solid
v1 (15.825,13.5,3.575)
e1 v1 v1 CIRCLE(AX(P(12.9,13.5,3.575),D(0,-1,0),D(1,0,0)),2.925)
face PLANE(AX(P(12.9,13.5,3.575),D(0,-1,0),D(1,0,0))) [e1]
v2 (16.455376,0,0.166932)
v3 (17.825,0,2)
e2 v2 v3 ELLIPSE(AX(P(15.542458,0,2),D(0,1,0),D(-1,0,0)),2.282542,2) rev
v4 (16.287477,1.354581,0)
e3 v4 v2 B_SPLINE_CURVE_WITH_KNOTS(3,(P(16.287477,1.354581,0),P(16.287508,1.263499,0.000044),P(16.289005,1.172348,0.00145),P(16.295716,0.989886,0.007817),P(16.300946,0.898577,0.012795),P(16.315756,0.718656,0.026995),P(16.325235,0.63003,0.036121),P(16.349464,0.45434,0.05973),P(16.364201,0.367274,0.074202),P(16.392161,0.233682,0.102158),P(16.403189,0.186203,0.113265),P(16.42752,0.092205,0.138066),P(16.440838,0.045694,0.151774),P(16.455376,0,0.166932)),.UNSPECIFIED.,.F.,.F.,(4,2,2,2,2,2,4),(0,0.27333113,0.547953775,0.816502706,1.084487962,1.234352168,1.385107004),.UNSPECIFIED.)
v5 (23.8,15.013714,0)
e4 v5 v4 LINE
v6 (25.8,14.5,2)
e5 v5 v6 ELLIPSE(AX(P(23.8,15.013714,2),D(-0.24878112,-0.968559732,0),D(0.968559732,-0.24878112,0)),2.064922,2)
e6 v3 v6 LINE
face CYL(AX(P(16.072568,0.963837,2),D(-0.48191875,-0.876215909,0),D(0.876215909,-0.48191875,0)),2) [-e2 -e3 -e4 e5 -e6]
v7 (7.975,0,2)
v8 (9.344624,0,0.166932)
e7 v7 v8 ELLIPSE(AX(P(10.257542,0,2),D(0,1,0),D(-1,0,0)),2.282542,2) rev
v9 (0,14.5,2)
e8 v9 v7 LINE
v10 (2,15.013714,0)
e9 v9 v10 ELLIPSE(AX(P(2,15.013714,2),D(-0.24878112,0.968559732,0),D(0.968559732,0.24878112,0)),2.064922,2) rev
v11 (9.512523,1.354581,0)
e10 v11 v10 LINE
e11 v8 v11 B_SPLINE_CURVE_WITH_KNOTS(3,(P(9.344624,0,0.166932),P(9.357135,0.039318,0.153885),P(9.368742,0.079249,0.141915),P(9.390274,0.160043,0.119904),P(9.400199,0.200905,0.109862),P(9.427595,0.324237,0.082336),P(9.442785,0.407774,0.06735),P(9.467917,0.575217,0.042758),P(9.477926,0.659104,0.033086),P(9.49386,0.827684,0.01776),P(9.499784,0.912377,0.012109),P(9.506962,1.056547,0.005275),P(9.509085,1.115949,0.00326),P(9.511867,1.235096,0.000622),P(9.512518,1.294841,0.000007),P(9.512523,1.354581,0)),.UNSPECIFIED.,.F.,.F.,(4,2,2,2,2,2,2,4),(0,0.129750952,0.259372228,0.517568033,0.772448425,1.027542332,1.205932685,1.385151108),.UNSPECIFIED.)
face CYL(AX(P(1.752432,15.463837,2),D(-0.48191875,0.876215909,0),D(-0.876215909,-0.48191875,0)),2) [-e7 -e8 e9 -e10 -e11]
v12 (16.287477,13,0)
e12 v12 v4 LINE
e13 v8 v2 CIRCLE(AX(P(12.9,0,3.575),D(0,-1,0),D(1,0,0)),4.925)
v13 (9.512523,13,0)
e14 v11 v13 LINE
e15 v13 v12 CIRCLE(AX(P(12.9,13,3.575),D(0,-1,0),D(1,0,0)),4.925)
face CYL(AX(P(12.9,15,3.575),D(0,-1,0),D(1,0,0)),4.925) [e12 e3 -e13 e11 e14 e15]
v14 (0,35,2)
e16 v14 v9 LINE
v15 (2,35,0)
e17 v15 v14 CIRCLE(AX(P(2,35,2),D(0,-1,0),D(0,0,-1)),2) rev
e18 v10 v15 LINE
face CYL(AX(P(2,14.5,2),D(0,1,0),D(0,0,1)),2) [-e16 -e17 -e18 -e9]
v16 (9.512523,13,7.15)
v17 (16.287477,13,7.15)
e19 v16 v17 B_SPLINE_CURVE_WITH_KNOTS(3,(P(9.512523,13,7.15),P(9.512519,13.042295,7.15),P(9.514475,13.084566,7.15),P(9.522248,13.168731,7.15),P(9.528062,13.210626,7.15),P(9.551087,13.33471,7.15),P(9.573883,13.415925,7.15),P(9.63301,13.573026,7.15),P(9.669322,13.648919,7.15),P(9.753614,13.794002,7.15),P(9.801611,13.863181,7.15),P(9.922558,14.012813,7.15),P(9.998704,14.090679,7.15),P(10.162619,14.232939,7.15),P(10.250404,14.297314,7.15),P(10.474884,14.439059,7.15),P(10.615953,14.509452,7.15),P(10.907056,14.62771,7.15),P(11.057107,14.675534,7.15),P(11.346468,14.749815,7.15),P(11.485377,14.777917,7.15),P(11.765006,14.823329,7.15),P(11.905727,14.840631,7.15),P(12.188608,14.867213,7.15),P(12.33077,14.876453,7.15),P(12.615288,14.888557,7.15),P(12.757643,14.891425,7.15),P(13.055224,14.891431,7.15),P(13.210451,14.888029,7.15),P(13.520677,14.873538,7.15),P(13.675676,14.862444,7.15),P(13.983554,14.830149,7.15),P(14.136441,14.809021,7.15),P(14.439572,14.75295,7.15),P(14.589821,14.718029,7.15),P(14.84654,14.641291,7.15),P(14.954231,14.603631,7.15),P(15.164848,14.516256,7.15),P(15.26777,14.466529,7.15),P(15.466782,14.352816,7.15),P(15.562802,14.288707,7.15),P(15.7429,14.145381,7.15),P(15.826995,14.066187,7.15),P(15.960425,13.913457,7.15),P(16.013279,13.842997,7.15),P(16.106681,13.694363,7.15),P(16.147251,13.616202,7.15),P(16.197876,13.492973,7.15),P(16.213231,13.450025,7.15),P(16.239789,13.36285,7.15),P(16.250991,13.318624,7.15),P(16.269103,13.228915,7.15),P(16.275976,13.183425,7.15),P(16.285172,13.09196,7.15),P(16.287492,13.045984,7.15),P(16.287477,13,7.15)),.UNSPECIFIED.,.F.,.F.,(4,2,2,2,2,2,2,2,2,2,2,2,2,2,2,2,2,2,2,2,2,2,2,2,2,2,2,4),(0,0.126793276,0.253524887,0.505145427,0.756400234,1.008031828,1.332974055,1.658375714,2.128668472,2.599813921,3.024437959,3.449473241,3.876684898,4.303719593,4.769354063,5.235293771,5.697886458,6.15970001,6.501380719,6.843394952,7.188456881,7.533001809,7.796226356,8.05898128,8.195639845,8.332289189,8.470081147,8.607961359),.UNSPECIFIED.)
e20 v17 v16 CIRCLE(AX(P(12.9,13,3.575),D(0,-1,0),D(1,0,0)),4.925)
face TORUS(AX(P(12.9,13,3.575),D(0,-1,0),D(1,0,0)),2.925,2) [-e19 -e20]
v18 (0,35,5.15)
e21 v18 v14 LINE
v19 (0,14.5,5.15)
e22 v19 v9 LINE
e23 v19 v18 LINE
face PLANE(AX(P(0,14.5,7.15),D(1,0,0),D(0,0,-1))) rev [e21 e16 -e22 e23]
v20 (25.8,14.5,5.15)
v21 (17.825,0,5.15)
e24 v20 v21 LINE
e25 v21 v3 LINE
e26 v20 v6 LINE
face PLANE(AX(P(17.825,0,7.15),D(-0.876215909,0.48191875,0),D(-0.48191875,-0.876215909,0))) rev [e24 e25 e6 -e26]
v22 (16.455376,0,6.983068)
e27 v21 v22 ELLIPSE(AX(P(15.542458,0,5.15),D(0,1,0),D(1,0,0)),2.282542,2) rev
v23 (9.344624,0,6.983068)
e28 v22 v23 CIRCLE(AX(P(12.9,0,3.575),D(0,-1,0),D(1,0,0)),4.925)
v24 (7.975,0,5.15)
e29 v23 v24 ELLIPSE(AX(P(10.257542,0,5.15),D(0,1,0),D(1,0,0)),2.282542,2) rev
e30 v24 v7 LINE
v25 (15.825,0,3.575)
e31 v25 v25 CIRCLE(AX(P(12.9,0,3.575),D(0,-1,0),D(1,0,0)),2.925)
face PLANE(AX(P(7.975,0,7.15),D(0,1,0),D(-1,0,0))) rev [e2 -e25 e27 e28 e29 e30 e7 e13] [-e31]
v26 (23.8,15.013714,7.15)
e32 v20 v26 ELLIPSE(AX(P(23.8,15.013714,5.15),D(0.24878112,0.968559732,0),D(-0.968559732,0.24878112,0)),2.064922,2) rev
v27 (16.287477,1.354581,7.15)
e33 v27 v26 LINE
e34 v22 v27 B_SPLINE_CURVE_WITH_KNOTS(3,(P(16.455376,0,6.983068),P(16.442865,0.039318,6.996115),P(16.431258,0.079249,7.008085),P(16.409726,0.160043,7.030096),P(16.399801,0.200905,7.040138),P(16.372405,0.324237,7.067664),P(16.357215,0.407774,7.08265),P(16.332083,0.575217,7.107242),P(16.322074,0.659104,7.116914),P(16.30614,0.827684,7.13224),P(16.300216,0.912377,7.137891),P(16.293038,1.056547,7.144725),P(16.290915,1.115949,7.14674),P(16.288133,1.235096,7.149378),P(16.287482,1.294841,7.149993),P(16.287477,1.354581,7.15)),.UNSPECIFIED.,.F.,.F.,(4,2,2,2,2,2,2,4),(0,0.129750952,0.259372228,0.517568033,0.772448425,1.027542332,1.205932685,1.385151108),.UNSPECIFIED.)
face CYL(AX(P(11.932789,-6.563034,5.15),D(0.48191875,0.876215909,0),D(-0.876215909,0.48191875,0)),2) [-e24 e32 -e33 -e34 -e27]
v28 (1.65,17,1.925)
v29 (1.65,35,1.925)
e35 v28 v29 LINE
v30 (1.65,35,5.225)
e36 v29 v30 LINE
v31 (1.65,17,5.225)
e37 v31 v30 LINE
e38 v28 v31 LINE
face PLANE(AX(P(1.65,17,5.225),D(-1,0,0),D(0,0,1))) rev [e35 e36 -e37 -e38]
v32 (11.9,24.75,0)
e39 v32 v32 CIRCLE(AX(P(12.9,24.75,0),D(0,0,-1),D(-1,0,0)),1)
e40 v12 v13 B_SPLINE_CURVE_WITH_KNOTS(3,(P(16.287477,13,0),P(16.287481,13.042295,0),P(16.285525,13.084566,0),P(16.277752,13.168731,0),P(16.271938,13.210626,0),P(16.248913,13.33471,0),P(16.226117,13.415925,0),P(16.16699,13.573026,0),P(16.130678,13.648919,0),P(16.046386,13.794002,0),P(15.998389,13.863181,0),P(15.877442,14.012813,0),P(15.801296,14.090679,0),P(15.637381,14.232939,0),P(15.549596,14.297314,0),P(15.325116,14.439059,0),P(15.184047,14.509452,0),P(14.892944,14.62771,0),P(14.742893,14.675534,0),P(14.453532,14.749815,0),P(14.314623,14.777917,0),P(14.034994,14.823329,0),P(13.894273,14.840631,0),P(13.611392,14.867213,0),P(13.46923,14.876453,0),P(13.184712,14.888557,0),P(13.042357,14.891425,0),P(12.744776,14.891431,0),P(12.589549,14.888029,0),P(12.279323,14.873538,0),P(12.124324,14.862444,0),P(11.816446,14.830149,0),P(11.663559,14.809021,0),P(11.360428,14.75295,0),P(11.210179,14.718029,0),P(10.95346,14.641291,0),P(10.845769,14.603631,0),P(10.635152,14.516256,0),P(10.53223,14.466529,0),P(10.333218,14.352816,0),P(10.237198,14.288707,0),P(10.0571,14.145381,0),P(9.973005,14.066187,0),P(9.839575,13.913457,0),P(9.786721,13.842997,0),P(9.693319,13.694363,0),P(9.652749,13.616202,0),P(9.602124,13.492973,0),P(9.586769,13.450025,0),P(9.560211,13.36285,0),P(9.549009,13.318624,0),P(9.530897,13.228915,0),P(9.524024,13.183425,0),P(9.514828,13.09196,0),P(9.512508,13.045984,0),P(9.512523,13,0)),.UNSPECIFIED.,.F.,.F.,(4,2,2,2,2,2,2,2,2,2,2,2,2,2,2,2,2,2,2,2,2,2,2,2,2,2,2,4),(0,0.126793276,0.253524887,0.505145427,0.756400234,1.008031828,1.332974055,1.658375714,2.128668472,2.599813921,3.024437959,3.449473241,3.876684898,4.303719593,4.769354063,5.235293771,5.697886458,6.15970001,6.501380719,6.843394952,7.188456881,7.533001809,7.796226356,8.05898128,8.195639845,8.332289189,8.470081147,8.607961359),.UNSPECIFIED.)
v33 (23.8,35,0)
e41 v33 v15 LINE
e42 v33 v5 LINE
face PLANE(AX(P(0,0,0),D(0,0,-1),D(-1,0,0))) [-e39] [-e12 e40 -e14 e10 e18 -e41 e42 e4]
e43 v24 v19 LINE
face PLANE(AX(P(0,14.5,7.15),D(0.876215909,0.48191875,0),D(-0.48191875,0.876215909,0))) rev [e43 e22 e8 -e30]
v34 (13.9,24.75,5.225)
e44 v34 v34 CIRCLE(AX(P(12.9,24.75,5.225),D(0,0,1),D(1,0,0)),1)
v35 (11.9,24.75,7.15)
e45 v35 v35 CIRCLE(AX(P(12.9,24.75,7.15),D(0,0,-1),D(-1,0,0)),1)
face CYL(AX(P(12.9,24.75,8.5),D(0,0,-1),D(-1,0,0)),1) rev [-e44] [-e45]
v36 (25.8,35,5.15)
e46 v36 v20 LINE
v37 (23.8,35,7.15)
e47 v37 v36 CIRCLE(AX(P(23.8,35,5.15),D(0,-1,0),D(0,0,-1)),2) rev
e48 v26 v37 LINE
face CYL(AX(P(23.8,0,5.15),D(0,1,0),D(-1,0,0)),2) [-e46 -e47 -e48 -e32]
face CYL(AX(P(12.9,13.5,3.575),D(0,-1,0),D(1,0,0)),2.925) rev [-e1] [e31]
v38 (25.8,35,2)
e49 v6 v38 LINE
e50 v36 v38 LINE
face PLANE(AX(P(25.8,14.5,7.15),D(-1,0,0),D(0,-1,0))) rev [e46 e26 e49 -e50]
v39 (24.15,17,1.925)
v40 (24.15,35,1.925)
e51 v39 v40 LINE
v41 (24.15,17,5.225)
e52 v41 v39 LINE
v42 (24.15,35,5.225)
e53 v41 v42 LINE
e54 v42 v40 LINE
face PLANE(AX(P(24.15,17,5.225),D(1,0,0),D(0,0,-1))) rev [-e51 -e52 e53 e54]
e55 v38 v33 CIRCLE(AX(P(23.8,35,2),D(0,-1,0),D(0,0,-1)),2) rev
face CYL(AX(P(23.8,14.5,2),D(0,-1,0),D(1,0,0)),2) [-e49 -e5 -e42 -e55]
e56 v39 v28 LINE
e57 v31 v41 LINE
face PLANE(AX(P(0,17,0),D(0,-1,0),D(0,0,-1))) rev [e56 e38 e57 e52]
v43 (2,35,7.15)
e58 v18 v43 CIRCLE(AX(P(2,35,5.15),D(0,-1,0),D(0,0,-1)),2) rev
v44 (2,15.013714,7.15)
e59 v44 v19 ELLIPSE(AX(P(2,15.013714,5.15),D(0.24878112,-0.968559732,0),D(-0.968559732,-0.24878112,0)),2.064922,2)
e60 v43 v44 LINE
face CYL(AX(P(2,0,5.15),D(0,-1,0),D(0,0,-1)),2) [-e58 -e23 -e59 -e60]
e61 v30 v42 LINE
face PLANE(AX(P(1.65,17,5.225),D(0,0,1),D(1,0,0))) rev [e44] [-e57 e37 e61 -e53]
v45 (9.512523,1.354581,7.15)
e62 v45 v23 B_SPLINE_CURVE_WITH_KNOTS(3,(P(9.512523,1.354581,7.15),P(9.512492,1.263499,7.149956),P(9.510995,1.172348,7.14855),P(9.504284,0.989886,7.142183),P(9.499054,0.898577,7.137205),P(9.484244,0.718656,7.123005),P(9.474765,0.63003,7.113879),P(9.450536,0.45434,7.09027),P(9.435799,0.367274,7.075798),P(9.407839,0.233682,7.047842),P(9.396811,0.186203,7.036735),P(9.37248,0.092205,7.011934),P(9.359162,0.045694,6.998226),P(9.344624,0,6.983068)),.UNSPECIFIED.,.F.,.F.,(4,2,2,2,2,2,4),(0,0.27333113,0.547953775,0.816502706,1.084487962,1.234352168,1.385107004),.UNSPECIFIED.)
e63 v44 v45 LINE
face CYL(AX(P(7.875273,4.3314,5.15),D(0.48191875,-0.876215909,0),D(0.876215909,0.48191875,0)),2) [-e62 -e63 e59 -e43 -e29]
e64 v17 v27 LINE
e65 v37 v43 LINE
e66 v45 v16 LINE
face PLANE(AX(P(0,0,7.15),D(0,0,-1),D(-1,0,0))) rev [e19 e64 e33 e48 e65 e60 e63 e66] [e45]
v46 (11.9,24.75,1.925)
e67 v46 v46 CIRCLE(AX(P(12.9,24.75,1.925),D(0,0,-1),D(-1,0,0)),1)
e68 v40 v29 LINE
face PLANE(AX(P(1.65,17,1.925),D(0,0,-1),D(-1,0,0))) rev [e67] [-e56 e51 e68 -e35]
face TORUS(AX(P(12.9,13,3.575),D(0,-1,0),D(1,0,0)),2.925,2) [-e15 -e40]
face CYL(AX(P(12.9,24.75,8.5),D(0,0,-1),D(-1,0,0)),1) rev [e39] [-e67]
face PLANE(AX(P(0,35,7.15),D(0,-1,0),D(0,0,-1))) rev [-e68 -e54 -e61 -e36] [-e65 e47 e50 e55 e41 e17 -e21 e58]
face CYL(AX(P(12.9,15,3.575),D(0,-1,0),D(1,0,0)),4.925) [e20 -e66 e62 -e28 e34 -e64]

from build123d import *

# Parameters (mm, degrees)
BOSS_EXTRUDE1_DEPTH = 7.15
SKETCH3_R           = 4.925
BOSS_EXTRUDE2_DEPTH = 15
SKETCH4_R           = 2.925
CUT_EXTRUDE1_DEPTH  = 13.5
SKETCH5_W           = 22.5
SKETCH5_H           = 3.3
CUT_EXTRUDE2_DEPTH  = 18
SKETCH6_R           = 1
CUT_EXTRUDE3_DEPTH  = 45.304514443
FILLET1_R           = 2


with BuildPart() as part:
    # Sketch2 → Boss-Extrude1 (new body)
    with BuildSketch(Plane.XY):
        Polygon((7.975, 0), (17.825, 0), (25.8, 14.5), (25.8, 35), (0, 35), (0, 14.5), align=None)
    extrude(amount=BOSS_EXTRUDE1_DEPTH)

    # Sketch3 → Boss-Extrude2 (add)
    with BuildSketch(Plane.XZ):
        with Locations((12.9, 3.575)):
            Circle(SKETCH3_R)
    extrude(amount=-BOSS_EXTRUDE2_DEPTH)

    # Sketch4 → Cut-Extrude1 (cut)
    with BuildSketch(Plane.XZ):
        with Locations((12.9, 3.575)):
            Circle(SKETCH4_R)
    extrude(amount=-CUT_EXTRUDE1_DEPTH, mode=Mode.SUBTRACT)

    # Sketch5 → Cut-Extrude2 (cut)
    with BuildSketch(Plane(origin=(0, 35, 0), x_dir=(1, 0, 0), z_dir=(0, 1, 0))):
        with Locations((12.9, -3.575)):
            Rectangle(SKETCH5_W, SKETCH5_H)
    extrude(amount=-CUT_EXTRUDE2_DEPTH, mode=Mode.SUBTRACT)

    # Sketch6 → Cut-Extrude3 (cut, through all)
    with BuildSketch(Plane(origin=(0, 0, 0), x_dir=(-1, 0, 0), z_dir=(0, 0, -1))):
        with Locations((-12.9, 24.75)):
            Circle(SKETCH6_R)
    extrude(amount=-CUT_EXTRUDE3_DEPTH, mode=Mode.SUBTRACT)

    # Fillet1
    # the kernel refuses this fillet: 2 mm, written as the material it takes off along each edge
    with BuildSketch(Plane(origin=(12.9, 15, 3.575), x_dir=(0.9794089200895291, 0, -0.20188652072157354), z_dir=(-0.20188652072157354, 0, -0.9794089200895291))) as fillet1_piece_1_section:
        with BuildLine():
            CenterArc((4.925 - FILLET1_R, FILLET1_R), FILLET1_R, 270, 90)
            Line((4.925 - FILLET1_R, 0), (4.925, 0))
            Line((4.925, 0), (4.925, FILLET1_R))
        make_face()
    fillet1_piece_1 = revolve(axis=Axis((12.9, 15, 3.575), (0, -1, 0)), revolution_arc=203.294598703, mode=Mode.PRIVATE)
    fillet1_piece_1 = split(fillet1_piece_1, bisect_by=Plane(origin=(12.9, 14.171762317, 7.15), z_dir=(0, 0, 1)), keep=Keep.TOP, mode=Mode.PRIVATE)
    add(fillet1_piece_1, mode=Mode.SUBTRACT)
    with BuildSketch(Plane(origin=(12.9, 15, 3.575), x_dir=(-0.9794089200895291, 0, 0.20188652072157326), z_dir=(0.20188652072157326, 0, 0.9794089200895291))) as fillet1_piece_2_section:
        with BuildLine():
            CenterArc((4.925 - FILLET1_R, FILLET1_R), FILLET1_R, 270, 90)
            Line((4.925 - FILLET1_R, 0), (4.925, 0))
            Line((4.925, 0), (4.925, FILLET1_R))
        make_face()
    fillet1_piece_2 = revolve(axis=Axis((12.9, 15, 3.575), (0, -1, 0)), revolution_arc=203.294598703, mode=Mode.PRIVATE)
    fillet1_piece_2 = split(fillet1_piece_2, bisect_by=Plane(origin=(12.9, 14.171762317, 0), z_dir=(0, 0, -1)), keep=Keep.TOP, mode=Mode.PRIVATE)
    add(fillet1_piece_2, mode=Mode.SUBTRACT)
    with BuildSketch(Plane(origin=(-2.409593749, 18.881079543, 7.15), x_dir=(0, 0, -1), z_dir=(0.48191874977215604, -0.876215908676647, 0))) as fillet1_piece_3_section:
        with BuildLine():
            CenterArc((FILLET1_R, FILLET1_R), FILLET1_R, 180, 90)
            Line((0, FILLET1_R), (0, 0))
            Line((0, 0), (FILLET1_R, 0))
        make_face()
    fillet1_piece_3 = extrude(amount=26.548432705, mode=Mode.PRIVATE)
    fillet1_piece_3 = fillet1_piece_3 - Plane(origin=(12.9, 7.738737356, 3.575), x_dir=(1, 0, 0), z_dir=(0, -1, 0)) * Cylinder(4.925, 62, mode=Mode.PRIVATE)
    add(fillet1_piece_3, mode=Mode.SUBTRACT)
    with BuildSketch(Plane(origin=(-2.409593749, 18.881079543, 0), x_dir=(0.876215908676647, 0.48191874977215604, 0), z_dir=(0.48191874977215604, -0.876215908676647, 0))) as fillet1_piece_4_section:
        with BuildLine():
            CenterArc((FILLET1_R, FILLET1_R), FILLET1_R, 180, 90)
            Line((0, FILLET1_R), (0, 0))
            Line((0, 0), (FILLET1_R, 0))
        make_face()
    fillet1_piece_4 = extrude(amount=26.548432705, mode=Mode.PRIVATE)
    fillet1_piece_4 = fillet1_piece_4 - Plane(origin=(12.9, 7.738737334, 3.575), x_dir=(1, 0, 0), z_dir=(0, -1, 0)) * Cylinder(4.925, 62, mode=Mode.PRIVATE)
    add(fillet1_piece_4, mode=Mode.SUBTRACT)
    with BuildSketch(Plane(origin=(15.415406251, -4.381079543, 7.15), x_dir=(-0.8762159086766471, 0.4819187497721556, 0), z_dir=(0.48191874977215565, 0.8762159086766471, 0))) as fillet1_piece_5_section:
        with BuildLine():
            CenterArc((FILLET1_R, -FILLET1_R), FILLET1_R, 90, 90)
            Line((0, -FILLET1_R), (0, 0))
            Line((0, 0), (FILLET1_R, 0))
        make_face()
    fillet1_piece_5 = extrude(amount=26.548432705, mode=Mode.PRIVATE)
    fillet1_piece_5 = fillet1_piece_5 - Plane(origin=(12.9, 7.738737334, 3.575), x_dir=(1, 0, 0), z_dir=(0, -1, 0)) * Cylinder(4.925, 62, mode=Mode.PRIVATE)
    add(fillet1_piece_5, mode=Mode.SUBTRACT)
    with BuildSketch(Plane(origin=(15.415406251, -4.381079543, 0), x_dir=(-0.8762159086766471, 0.4819187497721556, 0), z_dir=(0.48191874977215565, 0.8762159086766471, 0))) as fillet1_piece_6_section:
        with BuildLine():
            CenterArc((FILLET1_R, FILLET1_R), FILLET1_R, 180, 90)
            Line((0, FILLET1_R), (0, 0))
            Line((0, 0), (FILLET1_R, 0))
        make_face()
    fillet1_piece_6 = extrude(amount=26.548432705, mode=Mode.PRIVATE)
    fillet1_piece_6 = fillet1_piece_6 - Plane(origin=(12.9, 7.738737305, 3.575), x_dir=(1, 0, 0), z_dir=(0, -1, 0)) * Cylinder(4.925, 62, mode=Mode.PRIVATE)
    add(fillet1_piece_6, mode=Mode.SUBTRACT)
    with BuildSketch(Plane(origin=(25.8, 9.5, 7.15), x_dir=(-1, 0, 0), z_dir=(0, 1, 0)), Plane(origin=(0, 40, 7.15), x_dir=(1, 0, 0), z_dir=(0, -1, 0))) as fillet1_piece_7:
        with BuildLine():
            CenterArc((FILLET1_R, -FILLET1_R), FILLET1_R, 90, 90)
            Line((0, -FILLET1_R), (0, 0))
            Line((0, 0), (FILLET1_R, 0))
        make_face()
    extrude(amount=30.5, mode=Mode.SUBTRACT)
    with BuildSketch(Plane(origin=(0, 40, 0), x_dir=(1, 0, 0), z_dir=(0, -1, 0)), Plane(origin=(25.8, 9.5, 0), x_dir=(-1, 0, 0), z_dir=(0, 1, 0))) as fillet1_piece_8:
        with BuildLine():
            CenterArc((FILLET1_R, FILLET1_R), FILLET1_R, 180, 90)
            Line((0, FILLET1_R), (0, 0))
            Line((0, 0), (FILLET1_R, 0))
        make_face()
    extrude(amount=30.5, mode=Mode.SUBTRACT)


solid = part.part
